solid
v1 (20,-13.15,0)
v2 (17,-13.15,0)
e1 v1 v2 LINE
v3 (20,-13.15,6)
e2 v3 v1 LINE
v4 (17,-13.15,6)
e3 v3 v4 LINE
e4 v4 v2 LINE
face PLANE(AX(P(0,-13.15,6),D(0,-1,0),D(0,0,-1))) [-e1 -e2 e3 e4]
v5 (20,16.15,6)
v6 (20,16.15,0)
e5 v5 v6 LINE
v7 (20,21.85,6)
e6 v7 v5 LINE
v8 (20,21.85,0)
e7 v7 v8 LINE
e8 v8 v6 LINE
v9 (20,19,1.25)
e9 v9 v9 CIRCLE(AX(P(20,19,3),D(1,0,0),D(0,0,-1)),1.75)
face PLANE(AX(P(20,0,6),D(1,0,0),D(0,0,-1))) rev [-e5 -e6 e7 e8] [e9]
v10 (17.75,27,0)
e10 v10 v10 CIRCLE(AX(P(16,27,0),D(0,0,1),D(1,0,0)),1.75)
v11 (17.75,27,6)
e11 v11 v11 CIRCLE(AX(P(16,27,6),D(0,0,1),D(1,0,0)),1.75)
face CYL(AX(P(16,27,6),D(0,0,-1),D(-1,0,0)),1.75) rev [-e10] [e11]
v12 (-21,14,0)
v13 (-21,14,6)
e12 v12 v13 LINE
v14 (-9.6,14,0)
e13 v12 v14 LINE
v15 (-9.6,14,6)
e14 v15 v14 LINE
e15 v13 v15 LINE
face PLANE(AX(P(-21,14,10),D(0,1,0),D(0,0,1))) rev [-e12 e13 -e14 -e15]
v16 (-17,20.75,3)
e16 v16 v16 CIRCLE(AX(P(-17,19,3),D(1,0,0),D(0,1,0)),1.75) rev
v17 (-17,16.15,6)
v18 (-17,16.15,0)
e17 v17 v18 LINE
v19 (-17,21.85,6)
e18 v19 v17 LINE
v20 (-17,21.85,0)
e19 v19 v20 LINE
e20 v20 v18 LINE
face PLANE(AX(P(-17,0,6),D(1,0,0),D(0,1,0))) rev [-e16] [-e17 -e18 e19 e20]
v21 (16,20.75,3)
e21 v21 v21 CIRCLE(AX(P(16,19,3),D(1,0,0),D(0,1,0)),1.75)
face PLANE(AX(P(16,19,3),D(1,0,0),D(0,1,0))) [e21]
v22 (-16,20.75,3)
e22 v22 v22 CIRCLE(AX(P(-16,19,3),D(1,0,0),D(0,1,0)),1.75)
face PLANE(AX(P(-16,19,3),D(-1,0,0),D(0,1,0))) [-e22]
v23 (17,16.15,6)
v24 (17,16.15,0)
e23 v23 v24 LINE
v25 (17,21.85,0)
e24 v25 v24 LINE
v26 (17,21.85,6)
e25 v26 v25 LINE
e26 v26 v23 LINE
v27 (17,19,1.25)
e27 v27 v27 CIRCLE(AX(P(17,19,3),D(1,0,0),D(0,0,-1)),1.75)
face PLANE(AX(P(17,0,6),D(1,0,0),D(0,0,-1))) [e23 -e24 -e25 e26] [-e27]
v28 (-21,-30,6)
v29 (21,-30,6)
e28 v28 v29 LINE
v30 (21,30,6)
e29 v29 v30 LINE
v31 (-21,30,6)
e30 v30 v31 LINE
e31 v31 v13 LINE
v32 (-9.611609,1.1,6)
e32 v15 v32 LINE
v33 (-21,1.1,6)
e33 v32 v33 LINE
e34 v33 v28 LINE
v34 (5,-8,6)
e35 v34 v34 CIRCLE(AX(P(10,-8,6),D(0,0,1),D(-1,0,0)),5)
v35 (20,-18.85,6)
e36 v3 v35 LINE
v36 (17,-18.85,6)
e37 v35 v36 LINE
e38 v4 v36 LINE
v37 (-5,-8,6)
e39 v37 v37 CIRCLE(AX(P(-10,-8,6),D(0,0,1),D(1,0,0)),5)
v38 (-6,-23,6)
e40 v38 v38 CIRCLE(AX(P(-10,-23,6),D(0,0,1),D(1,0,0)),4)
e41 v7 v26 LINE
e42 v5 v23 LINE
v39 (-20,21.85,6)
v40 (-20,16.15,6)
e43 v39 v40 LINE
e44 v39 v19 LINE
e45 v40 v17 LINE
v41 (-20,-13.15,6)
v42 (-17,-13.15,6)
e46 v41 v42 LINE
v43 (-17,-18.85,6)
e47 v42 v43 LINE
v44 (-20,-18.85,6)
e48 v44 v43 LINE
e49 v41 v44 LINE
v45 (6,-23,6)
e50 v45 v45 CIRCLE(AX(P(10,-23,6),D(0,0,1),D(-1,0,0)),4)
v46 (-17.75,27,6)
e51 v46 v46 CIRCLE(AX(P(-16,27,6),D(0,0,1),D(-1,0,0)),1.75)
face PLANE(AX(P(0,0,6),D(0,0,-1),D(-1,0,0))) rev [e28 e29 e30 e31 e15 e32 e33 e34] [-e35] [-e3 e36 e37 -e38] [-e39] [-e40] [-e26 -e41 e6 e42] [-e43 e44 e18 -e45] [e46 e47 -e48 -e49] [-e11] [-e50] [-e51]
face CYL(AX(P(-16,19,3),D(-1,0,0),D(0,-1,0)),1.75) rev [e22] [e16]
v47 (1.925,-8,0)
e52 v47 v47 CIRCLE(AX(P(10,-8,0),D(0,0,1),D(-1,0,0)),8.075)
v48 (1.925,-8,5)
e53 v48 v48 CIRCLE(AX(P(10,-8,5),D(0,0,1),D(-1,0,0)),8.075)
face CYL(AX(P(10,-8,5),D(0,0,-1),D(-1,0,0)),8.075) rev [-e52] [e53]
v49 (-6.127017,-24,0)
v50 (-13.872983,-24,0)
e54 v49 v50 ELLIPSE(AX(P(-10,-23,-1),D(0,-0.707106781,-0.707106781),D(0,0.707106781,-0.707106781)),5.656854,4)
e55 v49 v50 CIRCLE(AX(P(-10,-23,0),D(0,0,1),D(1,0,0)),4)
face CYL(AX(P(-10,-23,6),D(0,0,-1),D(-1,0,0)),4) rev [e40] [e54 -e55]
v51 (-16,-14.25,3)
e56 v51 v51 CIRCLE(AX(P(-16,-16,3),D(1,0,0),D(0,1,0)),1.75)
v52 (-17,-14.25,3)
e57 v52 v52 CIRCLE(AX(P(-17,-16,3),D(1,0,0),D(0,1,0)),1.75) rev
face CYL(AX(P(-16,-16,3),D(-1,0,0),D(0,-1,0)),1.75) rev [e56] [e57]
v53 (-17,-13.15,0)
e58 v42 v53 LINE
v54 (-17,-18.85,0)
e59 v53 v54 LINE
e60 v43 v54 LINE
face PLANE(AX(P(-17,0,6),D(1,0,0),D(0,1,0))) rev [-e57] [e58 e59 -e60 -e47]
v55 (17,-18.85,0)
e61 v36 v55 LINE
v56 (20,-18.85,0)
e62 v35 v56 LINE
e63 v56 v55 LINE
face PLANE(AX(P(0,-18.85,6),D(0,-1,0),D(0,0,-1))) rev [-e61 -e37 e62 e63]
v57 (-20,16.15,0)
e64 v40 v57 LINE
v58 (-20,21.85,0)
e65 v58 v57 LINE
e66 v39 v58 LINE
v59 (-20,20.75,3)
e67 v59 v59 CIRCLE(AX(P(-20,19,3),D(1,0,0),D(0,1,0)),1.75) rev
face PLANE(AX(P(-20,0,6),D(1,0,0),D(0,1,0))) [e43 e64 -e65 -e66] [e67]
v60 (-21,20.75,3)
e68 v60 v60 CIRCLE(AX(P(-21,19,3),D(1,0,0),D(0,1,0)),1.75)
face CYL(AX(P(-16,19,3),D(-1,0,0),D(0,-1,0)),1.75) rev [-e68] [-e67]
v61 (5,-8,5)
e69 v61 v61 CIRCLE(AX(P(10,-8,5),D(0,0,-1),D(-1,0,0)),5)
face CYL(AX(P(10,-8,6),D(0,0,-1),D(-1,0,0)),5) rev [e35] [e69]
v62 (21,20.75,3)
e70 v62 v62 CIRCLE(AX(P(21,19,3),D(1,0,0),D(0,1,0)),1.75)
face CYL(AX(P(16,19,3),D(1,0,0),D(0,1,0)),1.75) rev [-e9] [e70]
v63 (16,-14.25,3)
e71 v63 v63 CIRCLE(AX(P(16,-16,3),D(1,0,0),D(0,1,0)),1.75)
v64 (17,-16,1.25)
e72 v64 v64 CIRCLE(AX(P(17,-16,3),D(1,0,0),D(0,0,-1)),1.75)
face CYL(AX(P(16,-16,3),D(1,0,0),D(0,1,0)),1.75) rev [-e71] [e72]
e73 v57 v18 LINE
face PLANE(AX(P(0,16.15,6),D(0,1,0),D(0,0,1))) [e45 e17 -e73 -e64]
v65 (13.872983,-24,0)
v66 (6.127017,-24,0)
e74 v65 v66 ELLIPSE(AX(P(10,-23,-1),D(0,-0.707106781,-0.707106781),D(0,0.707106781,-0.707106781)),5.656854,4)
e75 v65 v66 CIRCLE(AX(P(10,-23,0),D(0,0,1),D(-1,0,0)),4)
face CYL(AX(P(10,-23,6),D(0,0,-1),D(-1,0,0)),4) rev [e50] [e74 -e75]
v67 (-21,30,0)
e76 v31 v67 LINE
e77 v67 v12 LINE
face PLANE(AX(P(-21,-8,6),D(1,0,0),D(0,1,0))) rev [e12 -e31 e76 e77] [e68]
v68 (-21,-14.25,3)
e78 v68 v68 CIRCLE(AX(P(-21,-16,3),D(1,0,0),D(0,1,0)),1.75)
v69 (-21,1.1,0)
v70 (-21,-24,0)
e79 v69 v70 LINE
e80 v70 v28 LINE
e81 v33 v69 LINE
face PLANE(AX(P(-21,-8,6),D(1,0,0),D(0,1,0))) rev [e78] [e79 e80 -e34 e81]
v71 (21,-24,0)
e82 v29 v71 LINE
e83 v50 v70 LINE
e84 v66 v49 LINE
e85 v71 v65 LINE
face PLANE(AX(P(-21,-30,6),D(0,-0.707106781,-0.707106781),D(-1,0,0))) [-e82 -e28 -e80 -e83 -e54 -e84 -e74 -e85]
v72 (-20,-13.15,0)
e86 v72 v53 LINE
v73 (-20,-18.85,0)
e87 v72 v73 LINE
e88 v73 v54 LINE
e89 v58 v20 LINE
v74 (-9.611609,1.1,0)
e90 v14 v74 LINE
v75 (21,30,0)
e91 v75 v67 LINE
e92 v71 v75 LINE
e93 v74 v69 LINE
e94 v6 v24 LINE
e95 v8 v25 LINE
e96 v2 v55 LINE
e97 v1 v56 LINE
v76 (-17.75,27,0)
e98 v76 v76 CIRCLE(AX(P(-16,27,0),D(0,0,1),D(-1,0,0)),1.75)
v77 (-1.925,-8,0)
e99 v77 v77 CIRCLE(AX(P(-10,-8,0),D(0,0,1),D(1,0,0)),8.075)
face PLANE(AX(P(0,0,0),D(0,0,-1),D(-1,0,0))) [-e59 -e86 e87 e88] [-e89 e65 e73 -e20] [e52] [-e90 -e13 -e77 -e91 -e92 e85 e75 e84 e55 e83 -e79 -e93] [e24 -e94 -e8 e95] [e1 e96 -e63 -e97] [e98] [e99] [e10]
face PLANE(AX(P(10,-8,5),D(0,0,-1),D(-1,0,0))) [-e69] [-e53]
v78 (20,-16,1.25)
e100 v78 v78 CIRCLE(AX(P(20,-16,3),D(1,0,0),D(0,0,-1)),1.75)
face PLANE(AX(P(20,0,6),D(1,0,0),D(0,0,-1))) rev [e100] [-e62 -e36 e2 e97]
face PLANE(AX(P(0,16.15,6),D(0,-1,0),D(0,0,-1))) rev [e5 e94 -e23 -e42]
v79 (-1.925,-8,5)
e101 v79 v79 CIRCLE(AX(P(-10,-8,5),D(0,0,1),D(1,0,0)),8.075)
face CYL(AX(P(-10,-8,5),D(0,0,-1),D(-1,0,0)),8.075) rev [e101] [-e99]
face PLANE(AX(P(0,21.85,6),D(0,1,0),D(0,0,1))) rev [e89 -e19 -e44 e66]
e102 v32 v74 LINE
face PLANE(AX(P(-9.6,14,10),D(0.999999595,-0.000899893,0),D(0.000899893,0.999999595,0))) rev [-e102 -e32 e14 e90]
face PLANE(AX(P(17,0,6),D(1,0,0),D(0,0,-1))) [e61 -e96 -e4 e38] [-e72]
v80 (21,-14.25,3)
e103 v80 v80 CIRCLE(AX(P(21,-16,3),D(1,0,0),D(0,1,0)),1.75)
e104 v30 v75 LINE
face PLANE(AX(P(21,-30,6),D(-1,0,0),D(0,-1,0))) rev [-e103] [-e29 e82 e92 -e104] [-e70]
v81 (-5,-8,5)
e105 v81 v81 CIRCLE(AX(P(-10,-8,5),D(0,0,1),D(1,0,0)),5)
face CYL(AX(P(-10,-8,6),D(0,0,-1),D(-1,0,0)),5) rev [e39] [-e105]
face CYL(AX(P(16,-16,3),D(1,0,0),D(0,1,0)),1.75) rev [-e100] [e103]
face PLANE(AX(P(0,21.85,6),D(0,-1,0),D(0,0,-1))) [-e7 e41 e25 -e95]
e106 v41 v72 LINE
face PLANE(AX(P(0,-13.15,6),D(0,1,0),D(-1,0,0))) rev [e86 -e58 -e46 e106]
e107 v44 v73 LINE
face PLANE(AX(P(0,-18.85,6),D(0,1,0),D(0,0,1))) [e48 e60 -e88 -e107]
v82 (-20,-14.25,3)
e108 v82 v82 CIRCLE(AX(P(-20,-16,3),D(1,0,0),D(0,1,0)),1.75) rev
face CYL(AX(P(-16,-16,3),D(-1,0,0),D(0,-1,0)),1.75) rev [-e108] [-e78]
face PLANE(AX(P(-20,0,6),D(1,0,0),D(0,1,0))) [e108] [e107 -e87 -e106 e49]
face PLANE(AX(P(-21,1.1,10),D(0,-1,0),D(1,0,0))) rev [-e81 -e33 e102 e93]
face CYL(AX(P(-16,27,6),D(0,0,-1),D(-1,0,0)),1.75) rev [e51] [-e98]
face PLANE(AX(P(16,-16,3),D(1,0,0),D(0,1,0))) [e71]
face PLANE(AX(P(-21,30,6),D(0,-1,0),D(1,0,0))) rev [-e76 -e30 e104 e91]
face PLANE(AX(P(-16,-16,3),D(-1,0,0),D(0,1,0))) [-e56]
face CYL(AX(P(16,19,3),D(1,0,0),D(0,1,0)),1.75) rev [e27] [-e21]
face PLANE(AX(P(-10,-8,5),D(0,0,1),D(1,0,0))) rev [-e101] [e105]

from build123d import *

# Parameters (mm, degrees)
SKETCH1_R           = 4
SKETCH1_R_2         = 5
SKETCH1_R_3         = 1.75
BOSS_EXTRUDE1_DEPTH = 6
CHAMFER1_SIZE       = 6
CUT_EXTRUDE2_DEPTH  = 10
SKETCH4_W           = 3
SKETCH4_H           = 5.7
CUT_EXTRUDE3_DEPTH  = 38.107950631
CUT_EXTRUDE4_START  = -6
SKETCH2_R           = 8.075
CUT_EXTRUDE4_DEPTH  = 5
SKETCH5_R           = 1.75
CUT_EXTRUDE5_DEPTH  = 5


with BuildPart() as part:
    # Sketch1 → Boss-Extrude1 (new body)
    with BuildSketch(Plane.XY):
        Polygon((-21, -30), (21, -30), (21, 30), (-21, 30), (-21, -8), align=None)
        with Locations((-10, -23)):
            Circle(SKETCH1_R, mode=Mode.SUBTRACT)
        with Locations((-10, -8)):
            Circle(SKETCH1_R_2, mode=Mode.SUBTRACT)
        with Locations(Location((10, -8, 0), (0, 0, 180))):
            Circle(SKETCH1_R_2, mode=Mode.SUBTRACT)
        with Locations(Location((10, -23, 0), (0, 0, 180))):
            Circle(SKETCH1_R, mode=Mode.SUBTRACT)
        with Locations((16, 27)):
            Circle(SKETCH1_R_3, mode=Mode.SUBTRACT)
        with Locations(Location((-16, 27, 0), (0, 0, 180))):
            Circle(SKETCH1_R_3, mode=Mode.SUBTRACT)
    extrude(amount=BOSS_EXTRUDE1_DEPTH)

    # Chamfer1
    # the kernel refuses this chamfer: 6 mm, written as the material it takes off along each edge
    with BuildSketch(Plane(origin=(-36.430097928, -30, 0), x_dir=(0, -0.027495876610586202, 0.9996219169112968), z_dir=(1, 0, 0))) as chamfer1_piece_1:
        Polygon((CHAMFER1_SIZE * 0.999621916911, -CHAMFER1_SIZE * 0.0274958766106), (-CHAMFER1_SIZE * 0.0274958766106, -CHAMFER1_SIZE * 0.999621916911), (0, 0), align=None)
    extrude(amount=72.860195856, mode=Mode.SUBTRACT)

    # Sketch3 → Cut-Extrude2 (cut)
    with BuildSketch(Plane(origin=(0, 0, 0), x_dir=(-1, 0, 0), z_dir=(0, 0, -1))):
        Polygon((9.6, 14), (9.611608629, 1.1), (21, 1.1), (21, 14), align=None)
    extrude(amount=-CUT_EXTRUDE2_DEPTH, mode=Mode.SUBTRACT)

    # Sketch4 → Cut-Extrude3 (cut, through all)
    with BuildSketch(Plane(origin=(0, 0, 0), x_dir=(-1, 0, 0), z_dir=(0, 0, -1))):
        with Locations((-18.5, -16)):
            Rectangle(SKETCH4_W, SKETCH4_H)
        with Locations((18.5, -16)):
            Rectangle(SKETCH4_W, SKETCH4_H)
        with Locations((-18.5, 19)):
            Rectangle(SKETCH4_W, SKETCH4_H)
        with Locations((18.5, 19)):
            Rectangle(SKETCH4_W, SKETCH4_H)
    extrude(amount=-CUT_EXTRUDE3_DEPTH, mode=Mode.SUBTRACT)

    # Sketch2 → Cut-Extrude4 (cut)
    with BuildSketch(Plane.XY.offset(6).offset(CUT_EXTRUDE4_START)):
        with Locations((-10, -8)):
            Circle(SKETCH2_R)
        with Locations(Location((10, -8, 0), (0, 0, 180))):
            Circle(SKETCH2_R)
    extrude(amount=CUT_EXTRUDE4_DEPTH, mode=Mode.SUBTRACT)

    # Sketch5 → Cut-Extrude5 (cut)
    with BuildSketch(Plane(origin=(21, 0, 0), x_dir=(0, 0, -1), z_dir=(1, 0, 0))):
        with Locations(Location((-3, -16, 0), (0, 0, 90))):
            Circle(SKETCH5_R)
        with Locations(Location((-3, 19, 0), (0, 0, 90))):
            Circle(SKETCH5_R)
    cut_extrude5 = extrude(amount=-CUT_EXTRUDE5_DEPTH, mode=Mode.SUBTRACT)

    # Mirror1: Cut-Extrude5 across plane
    add(cut_extrude5.mirror(Plane(origin=(0, 0, 0), x_dir=(0, 0, 1), z_dir=(1, 0, 0))), mode=Mode.SUBTRACT)


solid = part.part
